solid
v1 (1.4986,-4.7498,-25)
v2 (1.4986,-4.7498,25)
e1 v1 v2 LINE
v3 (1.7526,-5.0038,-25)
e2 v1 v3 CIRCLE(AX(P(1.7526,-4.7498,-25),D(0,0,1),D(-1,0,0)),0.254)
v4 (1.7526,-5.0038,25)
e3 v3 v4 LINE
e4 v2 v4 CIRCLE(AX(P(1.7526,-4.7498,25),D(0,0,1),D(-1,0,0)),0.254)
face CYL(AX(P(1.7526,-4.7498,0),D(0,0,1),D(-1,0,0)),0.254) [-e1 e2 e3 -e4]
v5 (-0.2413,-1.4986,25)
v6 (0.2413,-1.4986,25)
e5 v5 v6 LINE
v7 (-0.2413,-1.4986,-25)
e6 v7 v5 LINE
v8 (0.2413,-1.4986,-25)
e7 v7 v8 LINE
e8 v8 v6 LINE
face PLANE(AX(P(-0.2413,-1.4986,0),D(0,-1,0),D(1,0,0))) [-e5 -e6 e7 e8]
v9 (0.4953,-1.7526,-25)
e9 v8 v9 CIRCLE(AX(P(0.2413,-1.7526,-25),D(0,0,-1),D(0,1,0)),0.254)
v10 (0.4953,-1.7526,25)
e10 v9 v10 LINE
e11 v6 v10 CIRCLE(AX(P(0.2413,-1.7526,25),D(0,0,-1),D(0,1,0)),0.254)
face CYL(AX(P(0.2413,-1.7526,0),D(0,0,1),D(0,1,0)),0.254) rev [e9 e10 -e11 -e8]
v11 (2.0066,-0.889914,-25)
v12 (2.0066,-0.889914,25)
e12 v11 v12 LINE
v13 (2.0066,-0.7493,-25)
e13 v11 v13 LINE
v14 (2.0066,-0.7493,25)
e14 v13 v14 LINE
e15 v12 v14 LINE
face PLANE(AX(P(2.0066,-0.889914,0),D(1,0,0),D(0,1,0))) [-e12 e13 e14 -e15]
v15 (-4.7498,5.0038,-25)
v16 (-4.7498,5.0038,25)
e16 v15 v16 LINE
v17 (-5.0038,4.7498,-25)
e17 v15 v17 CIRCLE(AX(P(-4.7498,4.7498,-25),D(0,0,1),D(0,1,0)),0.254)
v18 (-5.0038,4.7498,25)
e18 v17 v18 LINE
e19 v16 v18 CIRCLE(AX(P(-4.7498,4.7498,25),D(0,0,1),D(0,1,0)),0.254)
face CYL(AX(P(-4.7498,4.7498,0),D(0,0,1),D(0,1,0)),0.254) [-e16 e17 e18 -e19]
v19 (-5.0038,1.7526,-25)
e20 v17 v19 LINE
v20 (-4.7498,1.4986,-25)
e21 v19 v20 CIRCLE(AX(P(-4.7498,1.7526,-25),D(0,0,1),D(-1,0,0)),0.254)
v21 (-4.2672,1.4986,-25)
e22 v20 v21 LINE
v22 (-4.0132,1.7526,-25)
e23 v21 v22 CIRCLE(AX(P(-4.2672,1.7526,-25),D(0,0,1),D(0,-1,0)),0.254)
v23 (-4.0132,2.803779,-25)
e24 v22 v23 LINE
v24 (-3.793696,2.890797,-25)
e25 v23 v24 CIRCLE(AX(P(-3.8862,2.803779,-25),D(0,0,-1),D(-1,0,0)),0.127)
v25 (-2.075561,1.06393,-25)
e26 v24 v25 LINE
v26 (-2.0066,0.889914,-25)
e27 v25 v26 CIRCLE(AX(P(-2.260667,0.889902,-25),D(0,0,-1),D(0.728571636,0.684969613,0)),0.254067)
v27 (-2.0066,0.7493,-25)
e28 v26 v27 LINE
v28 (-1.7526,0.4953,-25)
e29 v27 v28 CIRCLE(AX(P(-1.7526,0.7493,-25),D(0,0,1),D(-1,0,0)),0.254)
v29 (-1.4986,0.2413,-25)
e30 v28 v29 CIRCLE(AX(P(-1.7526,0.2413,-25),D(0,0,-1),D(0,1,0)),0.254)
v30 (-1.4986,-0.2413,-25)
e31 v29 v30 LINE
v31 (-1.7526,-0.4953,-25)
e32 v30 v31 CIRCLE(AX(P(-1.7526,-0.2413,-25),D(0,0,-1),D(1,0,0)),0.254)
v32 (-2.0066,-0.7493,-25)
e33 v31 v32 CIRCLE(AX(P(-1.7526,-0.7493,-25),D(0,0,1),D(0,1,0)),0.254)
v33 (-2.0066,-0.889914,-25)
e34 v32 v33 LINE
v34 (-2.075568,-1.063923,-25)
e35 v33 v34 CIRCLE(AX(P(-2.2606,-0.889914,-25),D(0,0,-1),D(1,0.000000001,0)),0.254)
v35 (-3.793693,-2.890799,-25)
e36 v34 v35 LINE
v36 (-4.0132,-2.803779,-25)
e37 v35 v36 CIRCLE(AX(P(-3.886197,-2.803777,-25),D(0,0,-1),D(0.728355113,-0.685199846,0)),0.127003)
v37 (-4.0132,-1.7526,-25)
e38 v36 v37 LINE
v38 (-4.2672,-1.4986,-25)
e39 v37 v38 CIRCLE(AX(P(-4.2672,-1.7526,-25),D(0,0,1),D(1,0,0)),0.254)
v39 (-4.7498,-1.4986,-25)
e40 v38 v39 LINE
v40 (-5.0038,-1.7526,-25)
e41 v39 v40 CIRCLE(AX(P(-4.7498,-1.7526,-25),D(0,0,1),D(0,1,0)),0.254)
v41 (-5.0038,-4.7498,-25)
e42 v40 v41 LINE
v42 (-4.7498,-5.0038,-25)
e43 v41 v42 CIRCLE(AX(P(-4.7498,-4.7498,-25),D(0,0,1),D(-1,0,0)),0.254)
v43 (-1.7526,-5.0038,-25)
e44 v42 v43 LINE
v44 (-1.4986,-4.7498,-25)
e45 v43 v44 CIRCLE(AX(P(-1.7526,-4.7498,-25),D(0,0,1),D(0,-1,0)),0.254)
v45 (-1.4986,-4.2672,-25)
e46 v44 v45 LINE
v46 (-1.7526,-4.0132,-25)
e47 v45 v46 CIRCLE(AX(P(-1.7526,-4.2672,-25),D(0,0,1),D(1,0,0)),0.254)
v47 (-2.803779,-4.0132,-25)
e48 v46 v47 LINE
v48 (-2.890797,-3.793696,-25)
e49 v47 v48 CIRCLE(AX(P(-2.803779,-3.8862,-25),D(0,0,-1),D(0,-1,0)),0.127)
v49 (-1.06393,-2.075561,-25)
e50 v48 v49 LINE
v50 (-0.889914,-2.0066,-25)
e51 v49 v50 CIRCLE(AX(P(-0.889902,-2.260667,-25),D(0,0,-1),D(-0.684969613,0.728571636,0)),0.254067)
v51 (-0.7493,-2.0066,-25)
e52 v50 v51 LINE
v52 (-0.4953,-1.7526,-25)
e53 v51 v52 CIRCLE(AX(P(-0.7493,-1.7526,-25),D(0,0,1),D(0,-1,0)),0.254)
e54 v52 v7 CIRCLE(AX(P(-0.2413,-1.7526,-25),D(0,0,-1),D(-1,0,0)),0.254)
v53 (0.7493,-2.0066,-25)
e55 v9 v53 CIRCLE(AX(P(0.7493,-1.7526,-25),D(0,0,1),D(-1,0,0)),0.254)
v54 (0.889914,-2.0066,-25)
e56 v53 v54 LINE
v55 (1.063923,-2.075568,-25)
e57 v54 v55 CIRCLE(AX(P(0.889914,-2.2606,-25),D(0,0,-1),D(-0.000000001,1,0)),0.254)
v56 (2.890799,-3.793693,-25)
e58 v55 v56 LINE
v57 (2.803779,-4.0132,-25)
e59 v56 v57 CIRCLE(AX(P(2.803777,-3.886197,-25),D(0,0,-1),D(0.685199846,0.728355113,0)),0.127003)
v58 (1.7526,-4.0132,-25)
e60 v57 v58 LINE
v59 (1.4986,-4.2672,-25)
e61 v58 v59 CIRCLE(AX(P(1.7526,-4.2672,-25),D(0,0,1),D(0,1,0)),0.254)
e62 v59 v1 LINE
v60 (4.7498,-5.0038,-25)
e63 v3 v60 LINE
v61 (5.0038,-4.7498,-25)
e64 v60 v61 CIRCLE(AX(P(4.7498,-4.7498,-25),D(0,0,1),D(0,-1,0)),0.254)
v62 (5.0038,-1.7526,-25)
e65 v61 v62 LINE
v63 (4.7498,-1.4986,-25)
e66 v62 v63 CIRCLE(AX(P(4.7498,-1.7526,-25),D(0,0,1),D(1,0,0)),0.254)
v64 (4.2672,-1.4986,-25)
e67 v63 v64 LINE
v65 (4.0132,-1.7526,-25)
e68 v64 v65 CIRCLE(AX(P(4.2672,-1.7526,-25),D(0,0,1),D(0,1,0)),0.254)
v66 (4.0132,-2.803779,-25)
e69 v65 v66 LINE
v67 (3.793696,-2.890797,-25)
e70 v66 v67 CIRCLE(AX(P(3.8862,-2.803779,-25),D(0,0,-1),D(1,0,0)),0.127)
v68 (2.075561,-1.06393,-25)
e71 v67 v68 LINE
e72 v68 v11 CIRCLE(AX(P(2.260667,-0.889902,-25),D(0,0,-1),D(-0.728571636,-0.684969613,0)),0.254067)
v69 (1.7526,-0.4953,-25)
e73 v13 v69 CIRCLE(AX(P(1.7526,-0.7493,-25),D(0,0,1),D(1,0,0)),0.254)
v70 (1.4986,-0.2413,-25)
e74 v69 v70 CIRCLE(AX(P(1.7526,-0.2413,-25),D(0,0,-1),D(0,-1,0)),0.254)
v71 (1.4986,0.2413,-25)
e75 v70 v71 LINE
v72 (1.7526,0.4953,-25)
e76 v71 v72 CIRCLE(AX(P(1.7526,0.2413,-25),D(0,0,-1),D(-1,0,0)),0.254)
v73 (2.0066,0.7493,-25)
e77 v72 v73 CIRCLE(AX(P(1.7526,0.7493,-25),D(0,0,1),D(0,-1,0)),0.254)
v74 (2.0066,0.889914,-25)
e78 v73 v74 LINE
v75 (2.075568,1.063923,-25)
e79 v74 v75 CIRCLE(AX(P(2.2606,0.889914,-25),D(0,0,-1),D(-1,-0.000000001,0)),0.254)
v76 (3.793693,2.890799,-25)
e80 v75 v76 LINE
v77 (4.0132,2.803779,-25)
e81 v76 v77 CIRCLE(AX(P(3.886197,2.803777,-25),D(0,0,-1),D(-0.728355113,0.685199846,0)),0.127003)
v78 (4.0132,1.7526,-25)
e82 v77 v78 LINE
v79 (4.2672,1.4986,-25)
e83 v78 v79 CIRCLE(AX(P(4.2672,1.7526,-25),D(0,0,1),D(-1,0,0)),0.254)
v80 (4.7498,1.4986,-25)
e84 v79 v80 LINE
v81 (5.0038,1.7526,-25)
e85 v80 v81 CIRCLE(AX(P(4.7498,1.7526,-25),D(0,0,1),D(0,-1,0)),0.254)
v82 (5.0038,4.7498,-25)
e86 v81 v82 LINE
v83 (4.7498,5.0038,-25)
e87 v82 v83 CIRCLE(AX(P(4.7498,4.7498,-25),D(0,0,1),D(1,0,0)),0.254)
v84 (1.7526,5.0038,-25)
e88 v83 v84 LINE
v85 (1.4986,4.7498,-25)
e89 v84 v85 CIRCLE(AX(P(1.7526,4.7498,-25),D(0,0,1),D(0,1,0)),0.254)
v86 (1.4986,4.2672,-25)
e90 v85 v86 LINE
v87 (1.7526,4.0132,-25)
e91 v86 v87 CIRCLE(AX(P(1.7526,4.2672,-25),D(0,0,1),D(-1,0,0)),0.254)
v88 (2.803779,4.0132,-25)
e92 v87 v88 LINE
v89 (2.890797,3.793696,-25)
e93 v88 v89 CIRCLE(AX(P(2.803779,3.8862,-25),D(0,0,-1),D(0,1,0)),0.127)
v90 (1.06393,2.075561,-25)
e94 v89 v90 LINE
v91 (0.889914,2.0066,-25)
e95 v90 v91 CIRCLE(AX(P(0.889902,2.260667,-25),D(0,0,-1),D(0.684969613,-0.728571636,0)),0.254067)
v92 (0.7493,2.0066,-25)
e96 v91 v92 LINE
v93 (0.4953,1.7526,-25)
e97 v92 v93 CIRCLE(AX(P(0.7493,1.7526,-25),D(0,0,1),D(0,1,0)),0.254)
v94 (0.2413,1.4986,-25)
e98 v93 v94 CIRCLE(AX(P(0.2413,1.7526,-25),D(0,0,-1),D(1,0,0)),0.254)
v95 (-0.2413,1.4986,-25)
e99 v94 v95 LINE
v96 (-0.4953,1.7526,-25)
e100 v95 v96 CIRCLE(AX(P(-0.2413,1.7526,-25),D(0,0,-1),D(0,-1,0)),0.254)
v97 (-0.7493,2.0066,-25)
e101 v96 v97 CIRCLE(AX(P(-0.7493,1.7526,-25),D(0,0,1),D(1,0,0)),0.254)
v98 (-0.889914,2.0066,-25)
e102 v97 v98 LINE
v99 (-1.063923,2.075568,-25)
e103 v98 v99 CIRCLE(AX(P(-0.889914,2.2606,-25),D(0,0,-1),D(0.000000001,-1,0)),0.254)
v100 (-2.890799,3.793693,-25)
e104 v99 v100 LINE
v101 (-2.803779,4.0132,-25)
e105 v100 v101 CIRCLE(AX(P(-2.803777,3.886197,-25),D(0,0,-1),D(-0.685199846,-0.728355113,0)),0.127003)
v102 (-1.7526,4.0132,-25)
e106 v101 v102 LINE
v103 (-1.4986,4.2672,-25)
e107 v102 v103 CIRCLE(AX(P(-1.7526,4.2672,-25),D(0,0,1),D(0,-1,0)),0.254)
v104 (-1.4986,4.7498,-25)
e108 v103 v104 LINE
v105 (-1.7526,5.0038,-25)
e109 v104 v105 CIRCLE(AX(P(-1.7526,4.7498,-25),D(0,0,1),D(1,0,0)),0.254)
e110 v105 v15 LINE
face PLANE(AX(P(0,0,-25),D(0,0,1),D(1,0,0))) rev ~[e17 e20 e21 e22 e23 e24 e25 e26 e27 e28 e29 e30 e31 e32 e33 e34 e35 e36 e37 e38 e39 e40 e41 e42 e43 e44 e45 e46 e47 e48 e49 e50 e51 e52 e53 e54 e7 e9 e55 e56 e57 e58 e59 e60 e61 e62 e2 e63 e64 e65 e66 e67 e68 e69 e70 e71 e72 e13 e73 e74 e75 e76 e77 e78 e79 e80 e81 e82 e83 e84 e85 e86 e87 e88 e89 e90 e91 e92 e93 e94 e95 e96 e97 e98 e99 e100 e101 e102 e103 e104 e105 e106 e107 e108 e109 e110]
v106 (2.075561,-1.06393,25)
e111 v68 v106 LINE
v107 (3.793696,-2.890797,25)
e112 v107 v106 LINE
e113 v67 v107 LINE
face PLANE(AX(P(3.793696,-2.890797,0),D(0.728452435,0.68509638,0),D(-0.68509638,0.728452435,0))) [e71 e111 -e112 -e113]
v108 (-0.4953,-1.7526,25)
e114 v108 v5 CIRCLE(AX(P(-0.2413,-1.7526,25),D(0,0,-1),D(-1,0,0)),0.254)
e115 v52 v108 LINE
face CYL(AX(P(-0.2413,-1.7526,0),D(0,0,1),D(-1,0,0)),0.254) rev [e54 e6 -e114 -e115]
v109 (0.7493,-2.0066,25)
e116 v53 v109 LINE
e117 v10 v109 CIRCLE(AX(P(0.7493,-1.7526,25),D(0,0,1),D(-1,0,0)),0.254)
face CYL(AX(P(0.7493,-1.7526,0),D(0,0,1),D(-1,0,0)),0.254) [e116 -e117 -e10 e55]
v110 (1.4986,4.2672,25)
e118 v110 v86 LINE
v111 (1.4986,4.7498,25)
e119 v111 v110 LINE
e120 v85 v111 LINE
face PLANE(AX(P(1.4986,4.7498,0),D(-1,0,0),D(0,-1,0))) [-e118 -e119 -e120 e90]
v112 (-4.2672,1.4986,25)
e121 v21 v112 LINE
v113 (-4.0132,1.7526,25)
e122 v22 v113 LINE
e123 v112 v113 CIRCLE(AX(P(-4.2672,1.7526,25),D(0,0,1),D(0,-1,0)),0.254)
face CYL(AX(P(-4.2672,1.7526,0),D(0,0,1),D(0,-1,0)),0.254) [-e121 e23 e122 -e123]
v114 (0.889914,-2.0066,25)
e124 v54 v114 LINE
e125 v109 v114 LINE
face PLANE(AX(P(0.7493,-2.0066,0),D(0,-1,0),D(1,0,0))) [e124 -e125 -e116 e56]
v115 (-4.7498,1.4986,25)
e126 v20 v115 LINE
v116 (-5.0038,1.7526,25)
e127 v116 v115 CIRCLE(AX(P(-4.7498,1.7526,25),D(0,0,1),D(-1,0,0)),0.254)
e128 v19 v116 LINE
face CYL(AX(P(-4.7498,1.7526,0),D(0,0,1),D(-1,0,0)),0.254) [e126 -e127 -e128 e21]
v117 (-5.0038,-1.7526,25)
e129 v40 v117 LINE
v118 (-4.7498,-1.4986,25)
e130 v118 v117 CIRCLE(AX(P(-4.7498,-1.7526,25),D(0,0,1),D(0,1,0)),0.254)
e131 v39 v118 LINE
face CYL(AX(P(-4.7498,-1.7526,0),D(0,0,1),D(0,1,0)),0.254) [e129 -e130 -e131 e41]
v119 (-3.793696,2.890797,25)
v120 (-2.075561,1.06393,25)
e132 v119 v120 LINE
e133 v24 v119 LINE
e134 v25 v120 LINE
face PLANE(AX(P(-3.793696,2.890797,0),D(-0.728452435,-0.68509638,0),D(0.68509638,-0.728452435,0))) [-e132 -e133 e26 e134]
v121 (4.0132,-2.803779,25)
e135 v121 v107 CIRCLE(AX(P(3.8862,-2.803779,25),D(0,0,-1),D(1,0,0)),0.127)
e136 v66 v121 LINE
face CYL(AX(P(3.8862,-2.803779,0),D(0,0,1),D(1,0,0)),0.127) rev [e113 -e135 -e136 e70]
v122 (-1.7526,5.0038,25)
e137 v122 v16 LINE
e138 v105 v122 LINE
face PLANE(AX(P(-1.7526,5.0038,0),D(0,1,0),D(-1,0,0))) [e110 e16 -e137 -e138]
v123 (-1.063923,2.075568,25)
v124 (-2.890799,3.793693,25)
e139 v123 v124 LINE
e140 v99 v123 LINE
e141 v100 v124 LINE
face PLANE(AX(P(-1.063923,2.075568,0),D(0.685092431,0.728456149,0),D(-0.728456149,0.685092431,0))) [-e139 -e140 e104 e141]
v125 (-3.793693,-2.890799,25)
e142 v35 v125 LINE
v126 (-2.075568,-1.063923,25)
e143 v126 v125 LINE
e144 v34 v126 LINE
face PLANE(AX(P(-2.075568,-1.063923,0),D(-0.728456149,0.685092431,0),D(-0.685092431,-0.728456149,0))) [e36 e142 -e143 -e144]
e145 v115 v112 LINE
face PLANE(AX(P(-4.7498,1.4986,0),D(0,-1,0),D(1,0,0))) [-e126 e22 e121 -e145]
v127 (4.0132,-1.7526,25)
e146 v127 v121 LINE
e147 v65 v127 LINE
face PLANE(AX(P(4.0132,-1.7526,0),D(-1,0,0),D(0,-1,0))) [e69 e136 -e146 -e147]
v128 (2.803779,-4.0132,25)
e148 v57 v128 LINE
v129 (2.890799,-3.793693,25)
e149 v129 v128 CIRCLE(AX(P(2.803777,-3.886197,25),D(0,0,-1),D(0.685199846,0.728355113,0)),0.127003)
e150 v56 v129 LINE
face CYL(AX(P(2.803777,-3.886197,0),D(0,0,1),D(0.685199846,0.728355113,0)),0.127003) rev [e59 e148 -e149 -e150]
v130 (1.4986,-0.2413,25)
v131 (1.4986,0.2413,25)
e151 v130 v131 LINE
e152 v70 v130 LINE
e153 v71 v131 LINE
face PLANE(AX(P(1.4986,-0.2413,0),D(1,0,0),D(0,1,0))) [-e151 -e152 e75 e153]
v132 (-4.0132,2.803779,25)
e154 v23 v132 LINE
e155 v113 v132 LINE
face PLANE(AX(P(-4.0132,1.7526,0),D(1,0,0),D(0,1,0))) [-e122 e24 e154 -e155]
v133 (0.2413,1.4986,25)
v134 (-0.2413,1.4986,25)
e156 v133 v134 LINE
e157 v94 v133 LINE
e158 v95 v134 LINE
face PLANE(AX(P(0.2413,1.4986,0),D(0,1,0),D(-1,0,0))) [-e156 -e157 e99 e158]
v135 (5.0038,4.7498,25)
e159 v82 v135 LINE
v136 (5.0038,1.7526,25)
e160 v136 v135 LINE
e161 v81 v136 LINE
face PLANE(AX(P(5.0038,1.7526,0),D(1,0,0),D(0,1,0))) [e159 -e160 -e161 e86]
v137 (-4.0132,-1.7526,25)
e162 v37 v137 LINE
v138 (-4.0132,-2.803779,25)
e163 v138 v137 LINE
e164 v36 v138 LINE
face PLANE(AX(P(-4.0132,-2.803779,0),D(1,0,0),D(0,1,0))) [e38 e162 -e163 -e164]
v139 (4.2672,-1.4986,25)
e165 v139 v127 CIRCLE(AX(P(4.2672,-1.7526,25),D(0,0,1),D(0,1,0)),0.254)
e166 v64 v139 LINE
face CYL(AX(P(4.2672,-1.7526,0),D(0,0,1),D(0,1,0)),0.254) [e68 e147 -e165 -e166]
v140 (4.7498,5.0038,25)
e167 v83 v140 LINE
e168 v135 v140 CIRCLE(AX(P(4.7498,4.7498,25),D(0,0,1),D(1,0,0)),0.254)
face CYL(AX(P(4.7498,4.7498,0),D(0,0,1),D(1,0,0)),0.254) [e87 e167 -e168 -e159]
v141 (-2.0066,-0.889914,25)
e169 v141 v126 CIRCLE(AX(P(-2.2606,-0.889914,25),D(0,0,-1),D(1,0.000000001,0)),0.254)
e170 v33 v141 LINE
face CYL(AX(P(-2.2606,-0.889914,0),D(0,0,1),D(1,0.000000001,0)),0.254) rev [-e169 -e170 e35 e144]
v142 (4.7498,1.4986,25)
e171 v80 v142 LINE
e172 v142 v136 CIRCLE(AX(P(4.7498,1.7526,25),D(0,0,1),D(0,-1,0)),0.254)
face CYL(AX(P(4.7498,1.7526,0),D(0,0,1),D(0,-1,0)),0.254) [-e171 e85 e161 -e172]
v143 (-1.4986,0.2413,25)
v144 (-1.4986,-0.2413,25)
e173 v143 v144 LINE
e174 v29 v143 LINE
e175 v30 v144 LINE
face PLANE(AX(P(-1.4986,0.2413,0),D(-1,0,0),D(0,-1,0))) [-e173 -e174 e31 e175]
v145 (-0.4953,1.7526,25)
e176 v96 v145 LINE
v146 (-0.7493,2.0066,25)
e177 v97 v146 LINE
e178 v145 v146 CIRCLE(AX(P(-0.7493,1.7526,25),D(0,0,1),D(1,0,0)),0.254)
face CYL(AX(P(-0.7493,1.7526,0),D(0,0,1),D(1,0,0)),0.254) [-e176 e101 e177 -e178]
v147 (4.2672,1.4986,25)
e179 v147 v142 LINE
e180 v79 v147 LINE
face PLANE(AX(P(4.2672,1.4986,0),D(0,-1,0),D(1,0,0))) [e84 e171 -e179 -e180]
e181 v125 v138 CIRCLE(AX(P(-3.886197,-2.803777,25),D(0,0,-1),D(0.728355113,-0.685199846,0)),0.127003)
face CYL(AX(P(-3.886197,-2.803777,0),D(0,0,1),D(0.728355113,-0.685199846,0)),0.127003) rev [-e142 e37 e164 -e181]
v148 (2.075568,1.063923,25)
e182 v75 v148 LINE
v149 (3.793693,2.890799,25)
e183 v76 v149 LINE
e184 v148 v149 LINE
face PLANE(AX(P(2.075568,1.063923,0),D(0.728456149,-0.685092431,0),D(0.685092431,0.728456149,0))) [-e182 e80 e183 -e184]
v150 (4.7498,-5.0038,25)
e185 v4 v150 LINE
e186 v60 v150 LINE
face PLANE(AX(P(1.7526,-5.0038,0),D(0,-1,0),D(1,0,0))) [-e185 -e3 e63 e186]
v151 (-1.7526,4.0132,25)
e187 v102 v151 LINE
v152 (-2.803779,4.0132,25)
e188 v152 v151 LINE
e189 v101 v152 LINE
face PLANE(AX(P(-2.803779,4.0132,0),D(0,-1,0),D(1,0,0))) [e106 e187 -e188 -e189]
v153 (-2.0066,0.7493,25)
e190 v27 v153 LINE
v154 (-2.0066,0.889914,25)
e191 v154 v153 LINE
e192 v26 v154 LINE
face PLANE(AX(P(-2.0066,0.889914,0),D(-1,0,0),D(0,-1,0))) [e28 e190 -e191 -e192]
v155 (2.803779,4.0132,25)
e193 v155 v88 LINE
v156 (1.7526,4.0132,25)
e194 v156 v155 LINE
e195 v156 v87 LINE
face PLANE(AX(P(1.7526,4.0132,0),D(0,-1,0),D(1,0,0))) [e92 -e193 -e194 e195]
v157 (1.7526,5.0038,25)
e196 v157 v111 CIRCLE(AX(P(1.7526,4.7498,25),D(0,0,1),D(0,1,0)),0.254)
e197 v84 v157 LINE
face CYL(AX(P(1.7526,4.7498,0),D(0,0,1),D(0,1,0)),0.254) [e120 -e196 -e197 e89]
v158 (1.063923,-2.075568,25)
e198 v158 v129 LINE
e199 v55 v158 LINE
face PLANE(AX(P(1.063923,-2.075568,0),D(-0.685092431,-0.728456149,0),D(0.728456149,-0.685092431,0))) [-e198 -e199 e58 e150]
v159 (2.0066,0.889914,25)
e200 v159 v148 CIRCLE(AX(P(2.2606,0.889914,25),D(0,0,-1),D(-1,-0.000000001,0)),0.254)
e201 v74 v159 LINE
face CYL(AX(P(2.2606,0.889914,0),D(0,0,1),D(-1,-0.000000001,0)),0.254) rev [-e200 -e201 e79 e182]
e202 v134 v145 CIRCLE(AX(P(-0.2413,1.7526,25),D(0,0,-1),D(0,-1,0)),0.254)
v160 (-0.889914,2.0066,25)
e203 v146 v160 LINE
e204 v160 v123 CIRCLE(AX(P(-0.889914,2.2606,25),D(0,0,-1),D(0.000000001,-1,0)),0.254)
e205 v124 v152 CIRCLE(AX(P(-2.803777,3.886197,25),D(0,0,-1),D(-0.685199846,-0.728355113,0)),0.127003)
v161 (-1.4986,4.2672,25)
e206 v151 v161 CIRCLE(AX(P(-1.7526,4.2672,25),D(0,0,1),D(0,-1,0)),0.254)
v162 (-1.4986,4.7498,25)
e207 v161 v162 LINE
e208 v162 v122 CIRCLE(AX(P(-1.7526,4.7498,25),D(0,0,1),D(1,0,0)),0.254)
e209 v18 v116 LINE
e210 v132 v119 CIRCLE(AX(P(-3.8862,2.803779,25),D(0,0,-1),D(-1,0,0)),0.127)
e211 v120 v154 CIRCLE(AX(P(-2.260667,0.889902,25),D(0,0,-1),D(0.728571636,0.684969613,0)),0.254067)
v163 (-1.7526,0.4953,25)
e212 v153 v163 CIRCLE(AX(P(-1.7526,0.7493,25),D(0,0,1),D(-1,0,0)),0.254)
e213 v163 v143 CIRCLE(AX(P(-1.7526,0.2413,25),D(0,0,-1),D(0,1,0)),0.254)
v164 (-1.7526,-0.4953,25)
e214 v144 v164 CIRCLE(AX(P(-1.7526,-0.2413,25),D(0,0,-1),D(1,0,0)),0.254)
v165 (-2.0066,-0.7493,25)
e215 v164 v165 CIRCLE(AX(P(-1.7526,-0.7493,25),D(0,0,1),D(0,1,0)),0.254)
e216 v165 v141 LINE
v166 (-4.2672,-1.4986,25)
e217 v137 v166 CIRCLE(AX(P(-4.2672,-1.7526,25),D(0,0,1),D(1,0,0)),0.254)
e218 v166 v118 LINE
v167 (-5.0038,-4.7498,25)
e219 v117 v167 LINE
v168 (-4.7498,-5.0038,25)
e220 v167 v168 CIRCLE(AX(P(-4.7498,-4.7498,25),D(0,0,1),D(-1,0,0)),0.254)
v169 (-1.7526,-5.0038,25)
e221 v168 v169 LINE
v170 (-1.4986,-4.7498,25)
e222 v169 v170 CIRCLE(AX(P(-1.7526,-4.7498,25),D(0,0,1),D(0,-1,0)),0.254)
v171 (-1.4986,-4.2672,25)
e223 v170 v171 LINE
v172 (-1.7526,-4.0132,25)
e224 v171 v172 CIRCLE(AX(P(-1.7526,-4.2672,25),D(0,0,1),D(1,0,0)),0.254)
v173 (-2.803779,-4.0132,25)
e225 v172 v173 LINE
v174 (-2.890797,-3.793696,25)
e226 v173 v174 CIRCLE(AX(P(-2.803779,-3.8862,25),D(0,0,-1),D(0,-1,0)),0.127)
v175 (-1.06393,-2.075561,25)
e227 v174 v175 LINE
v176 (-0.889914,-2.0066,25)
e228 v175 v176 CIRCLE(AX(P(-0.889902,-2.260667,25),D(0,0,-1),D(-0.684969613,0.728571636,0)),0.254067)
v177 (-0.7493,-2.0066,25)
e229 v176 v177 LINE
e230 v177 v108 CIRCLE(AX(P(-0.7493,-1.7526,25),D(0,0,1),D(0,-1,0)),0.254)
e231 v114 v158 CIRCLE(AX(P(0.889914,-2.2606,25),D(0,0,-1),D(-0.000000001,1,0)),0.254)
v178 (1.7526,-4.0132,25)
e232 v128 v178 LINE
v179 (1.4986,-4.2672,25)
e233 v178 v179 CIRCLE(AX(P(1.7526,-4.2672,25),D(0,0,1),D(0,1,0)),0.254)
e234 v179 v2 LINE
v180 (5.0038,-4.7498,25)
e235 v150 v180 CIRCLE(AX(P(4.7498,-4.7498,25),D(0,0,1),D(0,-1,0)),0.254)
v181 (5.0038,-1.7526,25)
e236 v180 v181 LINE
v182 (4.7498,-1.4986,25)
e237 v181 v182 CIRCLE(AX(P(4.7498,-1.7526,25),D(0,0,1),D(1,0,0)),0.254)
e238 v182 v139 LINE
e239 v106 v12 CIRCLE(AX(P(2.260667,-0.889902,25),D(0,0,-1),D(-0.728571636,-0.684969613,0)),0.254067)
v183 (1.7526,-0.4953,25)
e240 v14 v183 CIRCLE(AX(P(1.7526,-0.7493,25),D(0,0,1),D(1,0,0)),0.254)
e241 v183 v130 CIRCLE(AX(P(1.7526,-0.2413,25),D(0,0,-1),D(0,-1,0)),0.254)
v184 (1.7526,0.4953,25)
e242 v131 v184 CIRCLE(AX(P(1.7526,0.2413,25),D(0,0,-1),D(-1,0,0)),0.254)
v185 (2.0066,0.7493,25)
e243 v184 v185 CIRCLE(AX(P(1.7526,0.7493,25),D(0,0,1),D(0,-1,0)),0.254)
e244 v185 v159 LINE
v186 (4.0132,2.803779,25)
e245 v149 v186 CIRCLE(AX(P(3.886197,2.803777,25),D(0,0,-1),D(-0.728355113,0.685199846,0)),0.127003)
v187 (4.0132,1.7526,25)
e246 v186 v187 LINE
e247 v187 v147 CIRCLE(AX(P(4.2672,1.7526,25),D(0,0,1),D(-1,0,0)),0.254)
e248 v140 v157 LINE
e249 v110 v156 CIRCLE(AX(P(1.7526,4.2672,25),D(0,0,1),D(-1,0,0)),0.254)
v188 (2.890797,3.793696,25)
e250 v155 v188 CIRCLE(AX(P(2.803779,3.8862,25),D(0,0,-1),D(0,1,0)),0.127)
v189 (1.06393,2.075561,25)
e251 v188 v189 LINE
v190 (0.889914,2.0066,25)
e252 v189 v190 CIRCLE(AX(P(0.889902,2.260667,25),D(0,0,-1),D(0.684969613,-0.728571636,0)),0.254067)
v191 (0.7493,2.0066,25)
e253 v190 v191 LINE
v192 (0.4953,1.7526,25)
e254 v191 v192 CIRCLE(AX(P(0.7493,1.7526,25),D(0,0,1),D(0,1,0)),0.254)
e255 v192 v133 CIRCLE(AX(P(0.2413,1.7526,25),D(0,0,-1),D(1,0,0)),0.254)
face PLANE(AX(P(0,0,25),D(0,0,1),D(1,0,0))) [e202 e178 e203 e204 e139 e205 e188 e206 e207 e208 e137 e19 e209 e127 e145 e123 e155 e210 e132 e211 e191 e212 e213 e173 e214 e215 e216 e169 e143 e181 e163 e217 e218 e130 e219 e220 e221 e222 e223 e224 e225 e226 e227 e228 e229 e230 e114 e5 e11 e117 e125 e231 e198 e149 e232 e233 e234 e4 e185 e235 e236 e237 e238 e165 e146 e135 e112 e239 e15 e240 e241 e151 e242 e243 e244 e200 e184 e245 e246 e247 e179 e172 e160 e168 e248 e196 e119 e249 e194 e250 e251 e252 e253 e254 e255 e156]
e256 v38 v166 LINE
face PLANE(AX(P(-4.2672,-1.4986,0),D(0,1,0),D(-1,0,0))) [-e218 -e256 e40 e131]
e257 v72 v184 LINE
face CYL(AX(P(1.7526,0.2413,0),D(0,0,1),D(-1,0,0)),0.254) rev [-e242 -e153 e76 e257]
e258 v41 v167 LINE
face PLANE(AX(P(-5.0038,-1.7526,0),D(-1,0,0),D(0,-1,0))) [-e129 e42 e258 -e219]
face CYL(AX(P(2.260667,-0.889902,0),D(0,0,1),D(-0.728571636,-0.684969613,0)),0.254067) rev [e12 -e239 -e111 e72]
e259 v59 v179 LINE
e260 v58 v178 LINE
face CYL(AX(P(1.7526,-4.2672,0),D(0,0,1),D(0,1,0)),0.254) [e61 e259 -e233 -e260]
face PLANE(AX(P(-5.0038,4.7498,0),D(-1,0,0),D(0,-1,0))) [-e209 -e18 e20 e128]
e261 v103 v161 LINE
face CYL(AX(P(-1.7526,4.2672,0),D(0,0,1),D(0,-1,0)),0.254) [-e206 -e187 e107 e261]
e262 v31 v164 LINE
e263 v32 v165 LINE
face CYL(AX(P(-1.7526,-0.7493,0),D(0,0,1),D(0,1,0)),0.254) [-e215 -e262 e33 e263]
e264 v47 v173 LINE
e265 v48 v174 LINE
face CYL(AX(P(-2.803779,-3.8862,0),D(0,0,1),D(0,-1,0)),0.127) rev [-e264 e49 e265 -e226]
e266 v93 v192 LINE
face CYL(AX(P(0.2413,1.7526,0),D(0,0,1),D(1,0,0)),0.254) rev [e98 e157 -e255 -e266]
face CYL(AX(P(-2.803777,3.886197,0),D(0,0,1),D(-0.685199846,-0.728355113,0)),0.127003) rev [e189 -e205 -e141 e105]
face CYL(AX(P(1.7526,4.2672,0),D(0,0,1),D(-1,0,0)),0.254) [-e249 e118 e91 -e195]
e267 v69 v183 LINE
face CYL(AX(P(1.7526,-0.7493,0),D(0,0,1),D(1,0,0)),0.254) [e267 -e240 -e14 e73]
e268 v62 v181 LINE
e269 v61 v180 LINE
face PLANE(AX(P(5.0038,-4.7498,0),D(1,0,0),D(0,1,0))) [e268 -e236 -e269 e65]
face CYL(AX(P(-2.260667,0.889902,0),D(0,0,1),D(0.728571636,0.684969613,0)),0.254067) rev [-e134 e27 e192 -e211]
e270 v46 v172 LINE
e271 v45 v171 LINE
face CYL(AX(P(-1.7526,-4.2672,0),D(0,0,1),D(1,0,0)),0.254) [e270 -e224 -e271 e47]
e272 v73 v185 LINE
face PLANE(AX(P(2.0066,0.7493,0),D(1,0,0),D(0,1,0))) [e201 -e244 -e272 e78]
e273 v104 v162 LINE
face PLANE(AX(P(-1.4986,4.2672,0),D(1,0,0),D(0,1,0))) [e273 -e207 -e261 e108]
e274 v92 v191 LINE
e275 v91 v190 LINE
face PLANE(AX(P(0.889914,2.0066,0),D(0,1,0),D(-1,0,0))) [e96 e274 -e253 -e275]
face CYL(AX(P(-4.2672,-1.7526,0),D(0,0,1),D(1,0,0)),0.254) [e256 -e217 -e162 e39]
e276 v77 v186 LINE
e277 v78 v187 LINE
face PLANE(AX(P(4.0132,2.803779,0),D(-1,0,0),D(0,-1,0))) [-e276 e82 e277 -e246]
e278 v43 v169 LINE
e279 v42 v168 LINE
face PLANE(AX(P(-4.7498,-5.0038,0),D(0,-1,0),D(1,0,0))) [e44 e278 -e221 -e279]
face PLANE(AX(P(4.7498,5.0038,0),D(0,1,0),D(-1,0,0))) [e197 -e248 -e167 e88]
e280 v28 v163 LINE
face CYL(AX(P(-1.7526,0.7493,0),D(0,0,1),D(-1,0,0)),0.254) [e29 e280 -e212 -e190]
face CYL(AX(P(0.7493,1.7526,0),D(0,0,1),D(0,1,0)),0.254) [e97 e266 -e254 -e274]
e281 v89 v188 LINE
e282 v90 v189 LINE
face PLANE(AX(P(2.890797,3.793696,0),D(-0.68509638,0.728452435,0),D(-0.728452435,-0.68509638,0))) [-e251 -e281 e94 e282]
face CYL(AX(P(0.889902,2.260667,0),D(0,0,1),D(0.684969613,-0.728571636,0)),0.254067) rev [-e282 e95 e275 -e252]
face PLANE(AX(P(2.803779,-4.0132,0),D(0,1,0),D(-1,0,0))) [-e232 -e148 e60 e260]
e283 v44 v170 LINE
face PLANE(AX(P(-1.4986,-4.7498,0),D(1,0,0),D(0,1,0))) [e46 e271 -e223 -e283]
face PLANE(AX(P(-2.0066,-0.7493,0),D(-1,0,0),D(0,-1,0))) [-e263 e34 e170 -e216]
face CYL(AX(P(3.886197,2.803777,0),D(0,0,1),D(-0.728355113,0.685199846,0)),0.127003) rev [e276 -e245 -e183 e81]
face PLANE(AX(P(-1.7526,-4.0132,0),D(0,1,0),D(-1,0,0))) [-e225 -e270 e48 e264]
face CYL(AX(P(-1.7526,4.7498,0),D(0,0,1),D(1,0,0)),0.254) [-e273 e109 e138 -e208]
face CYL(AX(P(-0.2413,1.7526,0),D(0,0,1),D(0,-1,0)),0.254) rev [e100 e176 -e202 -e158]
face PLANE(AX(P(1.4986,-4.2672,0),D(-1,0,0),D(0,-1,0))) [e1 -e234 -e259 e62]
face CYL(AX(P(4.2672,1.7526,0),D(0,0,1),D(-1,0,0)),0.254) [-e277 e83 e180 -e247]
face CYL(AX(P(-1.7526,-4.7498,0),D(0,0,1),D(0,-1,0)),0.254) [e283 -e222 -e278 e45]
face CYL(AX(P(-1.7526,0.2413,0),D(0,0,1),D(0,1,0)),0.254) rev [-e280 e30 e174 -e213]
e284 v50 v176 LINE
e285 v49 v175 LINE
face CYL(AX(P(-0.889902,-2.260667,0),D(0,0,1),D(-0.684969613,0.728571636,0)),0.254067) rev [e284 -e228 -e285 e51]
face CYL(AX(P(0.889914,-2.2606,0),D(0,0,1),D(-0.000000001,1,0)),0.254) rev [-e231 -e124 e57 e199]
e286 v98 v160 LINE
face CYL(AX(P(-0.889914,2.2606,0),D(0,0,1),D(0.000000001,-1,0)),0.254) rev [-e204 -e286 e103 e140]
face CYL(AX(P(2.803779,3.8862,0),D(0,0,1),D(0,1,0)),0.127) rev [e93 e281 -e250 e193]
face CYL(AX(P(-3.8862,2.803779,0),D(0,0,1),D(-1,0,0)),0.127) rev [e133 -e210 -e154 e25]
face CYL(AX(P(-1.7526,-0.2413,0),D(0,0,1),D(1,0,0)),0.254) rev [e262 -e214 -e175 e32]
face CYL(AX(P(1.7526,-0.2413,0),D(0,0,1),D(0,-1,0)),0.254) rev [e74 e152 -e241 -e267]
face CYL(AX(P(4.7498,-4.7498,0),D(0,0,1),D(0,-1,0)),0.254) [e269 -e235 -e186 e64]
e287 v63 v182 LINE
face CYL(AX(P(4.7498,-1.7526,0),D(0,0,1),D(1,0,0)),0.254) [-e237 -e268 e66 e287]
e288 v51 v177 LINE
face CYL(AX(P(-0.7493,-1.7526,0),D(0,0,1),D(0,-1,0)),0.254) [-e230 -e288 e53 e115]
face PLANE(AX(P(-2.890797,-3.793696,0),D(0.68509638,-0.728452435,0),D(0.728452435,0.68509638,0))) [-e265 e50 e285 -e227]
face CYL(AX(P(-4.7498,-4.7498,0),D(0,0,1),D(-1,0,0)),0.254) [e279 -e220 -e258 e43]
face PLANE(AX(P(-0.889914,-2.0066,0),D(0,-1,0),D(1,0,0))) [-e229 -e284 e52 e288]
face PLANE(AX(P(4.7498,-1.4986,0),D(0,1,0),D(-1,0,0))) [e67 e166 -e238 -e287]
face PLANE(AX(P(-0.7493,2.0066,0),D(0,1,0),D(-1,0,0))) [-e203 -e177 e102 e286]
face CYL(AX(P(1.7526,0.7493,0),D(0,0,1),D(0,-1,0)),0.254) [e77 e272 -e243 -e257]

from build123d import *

# Parameters (mm, degrees)
F1_DEPTH = 25


# Not quite as in the source:
# - ends of sketch curves that miss each other by under 0.0002 mm in the source are joined


with BuildPart() as f1:
    # F0 (on Top) → F1 (new body, symmetric)
    with BuildSketch(Plane.XY):
        with BuildLine():
            ThreePointArc((2.803779, 4.0132), (2.9218403787, 3.9330028938), (2.8907965459, 3.7936962341))
            Line((2.8907965459, 3.7936962341), (1.0639298, 2.075561))
            ThreePointArc((1.0639298, 2.075561), (0.9835034993, 2.0244706276), (0.8899144, 2.0066))
            Line((0.8899144, 2.0066), (0.7493, 2.0066))
            ThreePointArc((0.7493, 2.0066), (0.5696948776, 1.9322051224), (0.4953, 1.7526))
            ThreePointArc((0.4953, 1.7526), (0.4209051224, 1.5729948776), (0.2413, 1.4986))
            Line((0.2413, 1.4986), (-0.2413, 1.4986))
            ThreePointArc((-0.2413, 1.4986), (-0.4209051224, 1.5729948776), (-0.4953, 1.7526))
            ThreePointArc((-0.4953, 1.7526), (-0.5696948776, 1.9322051224), (-0.7493, 2.0066))
            Line((-0.7493, 2.0066), (-0.8899144, 2.0066))
            ThreePointArc((-0.8899144, 2.0066), (-0.9835034993, 2.0244706276), (-1.0639233392, 2.0755678701))
            Line((-1.0639233392, 2.0755678701), (-2.8907994, 3.7936932))
            ThreePointArc((-2.8907994, 3.7936932), (-2.9218403787, 3.9330028938), (-2.803779, 4.0132))
            Line((-2.803779, 4.0132), (-1.7526, 4.0132))
            ThreePointArc((-1.7526, 4.0132), (-1.5729948776, 4.0875948776), (-1.4986, 4.2672))
            Line((-1.4986, 4.2672), (-1.4986, 4.7498))
            ThreePointArc((-1.4986, 4.7498), (-1.5729948776, 4.9294051224), (-1.7526, 5.0038))
            Line((-1.7526, 5.0038), (-4.7498, 5.0038))
            ThreePointArc((-4.7498, 5.0038), (-4.9294051224, 4.9294051224), (-5.0038, 4.7498))
            Line((-5.0038, 4.7498), (-5.0038, 1.7526))
            ThreePointArc((-5.0038, 1.7526), (-4.9294051224, 1.5729948776), (-4.7498, 1.4986))
            Line((-4.7498, 1.4986), (-4.2672, 1.4986))
            ThreePointArc((-4.2672, 1.4986), (-4.0875948776, 1.5729948776), (-4.0132, 1.7526))
            Line((-4.0132, 1.7526), (-4.0132, 2.803779))
            ThreePointArc((-4.0132, 2.803779), (-3.9330028938, 2.9218403787), (-3.7936962341, 2.8907965459))
            Line((-3.7936962341, 2.8907965459), (-2.075561, 1.0639298))
            ThreePointArc((-2.075561, 1.0639298), (-2.0244706276, 0.9835034993), (-2.0066, 0.8899144))
            Line((-2.0066, 0.8899144), (-2.0066, 0.7493))
            ThreePointArc((-2.0066, 0.7493), (-1.9322051224, 0.5696948776), (-1.7526, 0.4953))
            ThreePointArc((-1.7526, 0.4953), (-1.5729948776, 0.4209051224), (-1.4986, 0.2413))
            Line((-1.4986, 0.2413), (-1.4986, -0.2413))
            ThreePointArc((-1.4986, -0.2413), (-1.5729948776, -0.4209051224), (-1.7526, -0.4953))
            ThreePointArc((-1.7526, -0.4953), (-1.9322051224, -0.5696948776), (-2.0066, -0.7493))
            Line((-2.0066, -0.7493), (-2.0066, -0.8899144))
            ThreePointArc((-2.0066, -0.8899144), (-2.0244706276, -0.9835034993), (-2.0755678701, -1.0639233392))
            Line((-2.0755678701, -1.0639233392), (-3.7936932, -2.8907994))
            ThreePointArc((-3.7936932, -2.8907994), (-3.9330028938, -2.9218403787), (-4.0132, -2.803779))
            Line((-4.0132, -2.803779), (-4.0132, -1.7526))
            ThreePointArc((-4.0132, -1.7526), (-4.0875948776, -1.5729948776), (-4.2672, -1.4986))
            Line((-4.2672, -1.4986), (-4.7498, -1.4986))
            ThreePointArc((-4.7498, -1.4986), (-4.9294051224, -1.5729948776), (-5.0038, -1.7526))
            Line((-5.0038, -1.7526), (-5.0038, -4.7498))
            ThreePointArc((-5.0038, -4.7498), (-4.9294051224, -4.9294051224), (-4.7498, -5.0038))
            Line((-4.7498, -5.0038), (-1.7526, -5.0038))
            ThreePointArc((-1.7526, -5.0038), (-1.5729948776, -4.9294051224), (-1.4986, -4.7498))
            Line((-1.4986, -4.7498), (-1.4986, -4.2672))
            ThreePointArc((-1.4986, -4.2672), (-1.5729948776, -4.0875948776), (-1.7526, -4.0132))
            Line((-1.7526, -4.0132), (-2.803779, -4.0132))
            ThreePointArc((-2.803779, -4.0132), (-2.9218403787, -3.9330028938), (-2.8907965459, -3.7936962341))
            Line((-2.8907965459, -3.7936962341), (-1.0639298, -2.075561))
            ThreePointArc((-1.0639298, -2.075561), (-0.9835034993, -2.0244706276), (-0.8899144, -2.0066))
            Line((-0.8899144, -2.0066), (-0.7493, -2.0066))
            ThreePointArc((-0.7493, -2.0066), (-0.5696948776, -1.9322051224), (-0.4953, -1.7526))
            ThreePointArc((-0.4953, -1.7526), (-0.4209051224, -1.5729948776), (-0.2413, -1.4986))
            Line((-0.2413, -1.4986), (0.2413, -1.4986))
            ThreePointArc((0.2413, -1.4986), (0.4209051224, -1.5729948776), (0.4953, -1.7526))
            ThreePointArc((0.4953, -1.7526), (0.5696948776, -1.9322051224), (0.7493, -2.0066))
            Line((0.7493, -2.0066), (0.8899144, -2.0066))
            ThreePointArc((0.8899144, -2.0066), (0.9835034993, -2.0244706276), (1.0639233392, -2.0755678701))
            Line((1.0639233392, -2.0755678701), (2.8907994, -3.7936932))
            ThreePointArc((2.8907994, -3.7936932), (2.9218403787, -3.9330028938), (2.803779, -4.0132))
            Line((2.803779, -4.0132), (1.7526, -4.0132))
            ThreePointArc((1.7526, -4.0132), (1.5729948776, -4.0875948776), (1.4986, -4.2672))
            Line((1.4986, -4.2672), (1.4986, -4.7498))
            ThreePointArc((1.4986, -4.7498), (1.5729948776, -4.9294051224), (1.7526, -5.0038))
            Line((1.7526, -5.0038), (4.7498, -5.0038))
            ThreePointArc((4.7498, -5.0038), (4.9294051224, -4.9294051224), (5.0038, -4.7498))
            Line((5.0038, -4.7498), (5.0038, -1.7526))
            ThreePointArc((5.0038, -1.7526), (4.9294051224, -1.5729948776), (4.7498, -1.4986))
            Line((4.7498, -1.4986), (4.2672, -1.4986))
            ThreePointArc((4.2672, -1.4986), (4.0875948776, -1.5729948776), (4.0132, -1.7526))
            Line((4.0132, -1.7526), (4.0132, -2.803779))
            ThreePointArc((4.0132, -2.803779), (3.9330028938, -2.9218403787), (3.7936962341, -2.8907965459))
            Line((3.7936962341, -2.8907965459), (2.075561, -1.0639298))
            ThreePointArc((2.075561, -1.0639298), (2.0244706276, -0.9835034993), (2.0066, -0.8899144))
            Line((2.0066, -0.8899144), (2.0066, -0.7493))
            ThreePointArc((2.0066, -0.7493), (1.9322051224, -0.5696948776), (1.7526, -0.4953))
            ThreePointArc((1.7526, -0.4953), (1.5729948776, -0.4209051224), (1.4986, -0.2413))
            Line((1.4986, -0.2413), (1.4986, 0.2413))
            ThreePointArc((1.4986, 0.2413), (1.5729948776, 0.4209051224), (1.7526, 0.4953))
            ThreePointArc((1.7526, 0.4953), (1.9322051224, 0.5696948776), (2.0066, 0.7493))
            Line((2.0066, 0.7493), (2.0066, 0.8899144))
            ThreePointArc((2.0066, 0.8899144), (2.0244706276, 0.9835034993), (2.0755678701, 1.0639233392))
            Line((2.0755678701, 1.0639233392), (3.7936932, 2.8907994))
            ThreePointArc((3.7936932, 2.8907994), (3.9330028938, 2.9218403787), (4.0132, 2.803779))
            Line((4.0132, 2.803779), (4.0132, 1.7526))
            ThreePointArc((4.0132, 1.7526), (4.0875948776, 1.5729948776), (4.2672, 1.4986))
            Line((4.2672, 1.4986), (4.7498, 1.4986))
            ThreePointArc((4.7498, 1.4986), (4.9294051224, 1.5729948776), (5.0038, 1.7526))
            Line((5.0038, 1.7526), (5.0038, 4.7498))
            ThreePointArc((5.0038, 4.7498), (4.9294051224, 4.9294051224), (4.7498, 5.0038))
            Line((4.7498, 5.0038), (1.7526, 5.0038))
            ThreePointArc((1.7526, 5.0038), (1.5729948776, 4.9294051224), (1.4986, 4.7498))
            Line((1.4986, 4.7498), (1.4986, 4.2672))
            ThreePointArc((1.4986, 4.2672), (1.5729948776, 4.0875948776), (1.7526, 4.0132))
            Line((1.7526, 4.0132), (2.803779, 4.0132))
        make_face()
    extrude(amount=F1_DEPTH, both=True)


solid = f1.part
